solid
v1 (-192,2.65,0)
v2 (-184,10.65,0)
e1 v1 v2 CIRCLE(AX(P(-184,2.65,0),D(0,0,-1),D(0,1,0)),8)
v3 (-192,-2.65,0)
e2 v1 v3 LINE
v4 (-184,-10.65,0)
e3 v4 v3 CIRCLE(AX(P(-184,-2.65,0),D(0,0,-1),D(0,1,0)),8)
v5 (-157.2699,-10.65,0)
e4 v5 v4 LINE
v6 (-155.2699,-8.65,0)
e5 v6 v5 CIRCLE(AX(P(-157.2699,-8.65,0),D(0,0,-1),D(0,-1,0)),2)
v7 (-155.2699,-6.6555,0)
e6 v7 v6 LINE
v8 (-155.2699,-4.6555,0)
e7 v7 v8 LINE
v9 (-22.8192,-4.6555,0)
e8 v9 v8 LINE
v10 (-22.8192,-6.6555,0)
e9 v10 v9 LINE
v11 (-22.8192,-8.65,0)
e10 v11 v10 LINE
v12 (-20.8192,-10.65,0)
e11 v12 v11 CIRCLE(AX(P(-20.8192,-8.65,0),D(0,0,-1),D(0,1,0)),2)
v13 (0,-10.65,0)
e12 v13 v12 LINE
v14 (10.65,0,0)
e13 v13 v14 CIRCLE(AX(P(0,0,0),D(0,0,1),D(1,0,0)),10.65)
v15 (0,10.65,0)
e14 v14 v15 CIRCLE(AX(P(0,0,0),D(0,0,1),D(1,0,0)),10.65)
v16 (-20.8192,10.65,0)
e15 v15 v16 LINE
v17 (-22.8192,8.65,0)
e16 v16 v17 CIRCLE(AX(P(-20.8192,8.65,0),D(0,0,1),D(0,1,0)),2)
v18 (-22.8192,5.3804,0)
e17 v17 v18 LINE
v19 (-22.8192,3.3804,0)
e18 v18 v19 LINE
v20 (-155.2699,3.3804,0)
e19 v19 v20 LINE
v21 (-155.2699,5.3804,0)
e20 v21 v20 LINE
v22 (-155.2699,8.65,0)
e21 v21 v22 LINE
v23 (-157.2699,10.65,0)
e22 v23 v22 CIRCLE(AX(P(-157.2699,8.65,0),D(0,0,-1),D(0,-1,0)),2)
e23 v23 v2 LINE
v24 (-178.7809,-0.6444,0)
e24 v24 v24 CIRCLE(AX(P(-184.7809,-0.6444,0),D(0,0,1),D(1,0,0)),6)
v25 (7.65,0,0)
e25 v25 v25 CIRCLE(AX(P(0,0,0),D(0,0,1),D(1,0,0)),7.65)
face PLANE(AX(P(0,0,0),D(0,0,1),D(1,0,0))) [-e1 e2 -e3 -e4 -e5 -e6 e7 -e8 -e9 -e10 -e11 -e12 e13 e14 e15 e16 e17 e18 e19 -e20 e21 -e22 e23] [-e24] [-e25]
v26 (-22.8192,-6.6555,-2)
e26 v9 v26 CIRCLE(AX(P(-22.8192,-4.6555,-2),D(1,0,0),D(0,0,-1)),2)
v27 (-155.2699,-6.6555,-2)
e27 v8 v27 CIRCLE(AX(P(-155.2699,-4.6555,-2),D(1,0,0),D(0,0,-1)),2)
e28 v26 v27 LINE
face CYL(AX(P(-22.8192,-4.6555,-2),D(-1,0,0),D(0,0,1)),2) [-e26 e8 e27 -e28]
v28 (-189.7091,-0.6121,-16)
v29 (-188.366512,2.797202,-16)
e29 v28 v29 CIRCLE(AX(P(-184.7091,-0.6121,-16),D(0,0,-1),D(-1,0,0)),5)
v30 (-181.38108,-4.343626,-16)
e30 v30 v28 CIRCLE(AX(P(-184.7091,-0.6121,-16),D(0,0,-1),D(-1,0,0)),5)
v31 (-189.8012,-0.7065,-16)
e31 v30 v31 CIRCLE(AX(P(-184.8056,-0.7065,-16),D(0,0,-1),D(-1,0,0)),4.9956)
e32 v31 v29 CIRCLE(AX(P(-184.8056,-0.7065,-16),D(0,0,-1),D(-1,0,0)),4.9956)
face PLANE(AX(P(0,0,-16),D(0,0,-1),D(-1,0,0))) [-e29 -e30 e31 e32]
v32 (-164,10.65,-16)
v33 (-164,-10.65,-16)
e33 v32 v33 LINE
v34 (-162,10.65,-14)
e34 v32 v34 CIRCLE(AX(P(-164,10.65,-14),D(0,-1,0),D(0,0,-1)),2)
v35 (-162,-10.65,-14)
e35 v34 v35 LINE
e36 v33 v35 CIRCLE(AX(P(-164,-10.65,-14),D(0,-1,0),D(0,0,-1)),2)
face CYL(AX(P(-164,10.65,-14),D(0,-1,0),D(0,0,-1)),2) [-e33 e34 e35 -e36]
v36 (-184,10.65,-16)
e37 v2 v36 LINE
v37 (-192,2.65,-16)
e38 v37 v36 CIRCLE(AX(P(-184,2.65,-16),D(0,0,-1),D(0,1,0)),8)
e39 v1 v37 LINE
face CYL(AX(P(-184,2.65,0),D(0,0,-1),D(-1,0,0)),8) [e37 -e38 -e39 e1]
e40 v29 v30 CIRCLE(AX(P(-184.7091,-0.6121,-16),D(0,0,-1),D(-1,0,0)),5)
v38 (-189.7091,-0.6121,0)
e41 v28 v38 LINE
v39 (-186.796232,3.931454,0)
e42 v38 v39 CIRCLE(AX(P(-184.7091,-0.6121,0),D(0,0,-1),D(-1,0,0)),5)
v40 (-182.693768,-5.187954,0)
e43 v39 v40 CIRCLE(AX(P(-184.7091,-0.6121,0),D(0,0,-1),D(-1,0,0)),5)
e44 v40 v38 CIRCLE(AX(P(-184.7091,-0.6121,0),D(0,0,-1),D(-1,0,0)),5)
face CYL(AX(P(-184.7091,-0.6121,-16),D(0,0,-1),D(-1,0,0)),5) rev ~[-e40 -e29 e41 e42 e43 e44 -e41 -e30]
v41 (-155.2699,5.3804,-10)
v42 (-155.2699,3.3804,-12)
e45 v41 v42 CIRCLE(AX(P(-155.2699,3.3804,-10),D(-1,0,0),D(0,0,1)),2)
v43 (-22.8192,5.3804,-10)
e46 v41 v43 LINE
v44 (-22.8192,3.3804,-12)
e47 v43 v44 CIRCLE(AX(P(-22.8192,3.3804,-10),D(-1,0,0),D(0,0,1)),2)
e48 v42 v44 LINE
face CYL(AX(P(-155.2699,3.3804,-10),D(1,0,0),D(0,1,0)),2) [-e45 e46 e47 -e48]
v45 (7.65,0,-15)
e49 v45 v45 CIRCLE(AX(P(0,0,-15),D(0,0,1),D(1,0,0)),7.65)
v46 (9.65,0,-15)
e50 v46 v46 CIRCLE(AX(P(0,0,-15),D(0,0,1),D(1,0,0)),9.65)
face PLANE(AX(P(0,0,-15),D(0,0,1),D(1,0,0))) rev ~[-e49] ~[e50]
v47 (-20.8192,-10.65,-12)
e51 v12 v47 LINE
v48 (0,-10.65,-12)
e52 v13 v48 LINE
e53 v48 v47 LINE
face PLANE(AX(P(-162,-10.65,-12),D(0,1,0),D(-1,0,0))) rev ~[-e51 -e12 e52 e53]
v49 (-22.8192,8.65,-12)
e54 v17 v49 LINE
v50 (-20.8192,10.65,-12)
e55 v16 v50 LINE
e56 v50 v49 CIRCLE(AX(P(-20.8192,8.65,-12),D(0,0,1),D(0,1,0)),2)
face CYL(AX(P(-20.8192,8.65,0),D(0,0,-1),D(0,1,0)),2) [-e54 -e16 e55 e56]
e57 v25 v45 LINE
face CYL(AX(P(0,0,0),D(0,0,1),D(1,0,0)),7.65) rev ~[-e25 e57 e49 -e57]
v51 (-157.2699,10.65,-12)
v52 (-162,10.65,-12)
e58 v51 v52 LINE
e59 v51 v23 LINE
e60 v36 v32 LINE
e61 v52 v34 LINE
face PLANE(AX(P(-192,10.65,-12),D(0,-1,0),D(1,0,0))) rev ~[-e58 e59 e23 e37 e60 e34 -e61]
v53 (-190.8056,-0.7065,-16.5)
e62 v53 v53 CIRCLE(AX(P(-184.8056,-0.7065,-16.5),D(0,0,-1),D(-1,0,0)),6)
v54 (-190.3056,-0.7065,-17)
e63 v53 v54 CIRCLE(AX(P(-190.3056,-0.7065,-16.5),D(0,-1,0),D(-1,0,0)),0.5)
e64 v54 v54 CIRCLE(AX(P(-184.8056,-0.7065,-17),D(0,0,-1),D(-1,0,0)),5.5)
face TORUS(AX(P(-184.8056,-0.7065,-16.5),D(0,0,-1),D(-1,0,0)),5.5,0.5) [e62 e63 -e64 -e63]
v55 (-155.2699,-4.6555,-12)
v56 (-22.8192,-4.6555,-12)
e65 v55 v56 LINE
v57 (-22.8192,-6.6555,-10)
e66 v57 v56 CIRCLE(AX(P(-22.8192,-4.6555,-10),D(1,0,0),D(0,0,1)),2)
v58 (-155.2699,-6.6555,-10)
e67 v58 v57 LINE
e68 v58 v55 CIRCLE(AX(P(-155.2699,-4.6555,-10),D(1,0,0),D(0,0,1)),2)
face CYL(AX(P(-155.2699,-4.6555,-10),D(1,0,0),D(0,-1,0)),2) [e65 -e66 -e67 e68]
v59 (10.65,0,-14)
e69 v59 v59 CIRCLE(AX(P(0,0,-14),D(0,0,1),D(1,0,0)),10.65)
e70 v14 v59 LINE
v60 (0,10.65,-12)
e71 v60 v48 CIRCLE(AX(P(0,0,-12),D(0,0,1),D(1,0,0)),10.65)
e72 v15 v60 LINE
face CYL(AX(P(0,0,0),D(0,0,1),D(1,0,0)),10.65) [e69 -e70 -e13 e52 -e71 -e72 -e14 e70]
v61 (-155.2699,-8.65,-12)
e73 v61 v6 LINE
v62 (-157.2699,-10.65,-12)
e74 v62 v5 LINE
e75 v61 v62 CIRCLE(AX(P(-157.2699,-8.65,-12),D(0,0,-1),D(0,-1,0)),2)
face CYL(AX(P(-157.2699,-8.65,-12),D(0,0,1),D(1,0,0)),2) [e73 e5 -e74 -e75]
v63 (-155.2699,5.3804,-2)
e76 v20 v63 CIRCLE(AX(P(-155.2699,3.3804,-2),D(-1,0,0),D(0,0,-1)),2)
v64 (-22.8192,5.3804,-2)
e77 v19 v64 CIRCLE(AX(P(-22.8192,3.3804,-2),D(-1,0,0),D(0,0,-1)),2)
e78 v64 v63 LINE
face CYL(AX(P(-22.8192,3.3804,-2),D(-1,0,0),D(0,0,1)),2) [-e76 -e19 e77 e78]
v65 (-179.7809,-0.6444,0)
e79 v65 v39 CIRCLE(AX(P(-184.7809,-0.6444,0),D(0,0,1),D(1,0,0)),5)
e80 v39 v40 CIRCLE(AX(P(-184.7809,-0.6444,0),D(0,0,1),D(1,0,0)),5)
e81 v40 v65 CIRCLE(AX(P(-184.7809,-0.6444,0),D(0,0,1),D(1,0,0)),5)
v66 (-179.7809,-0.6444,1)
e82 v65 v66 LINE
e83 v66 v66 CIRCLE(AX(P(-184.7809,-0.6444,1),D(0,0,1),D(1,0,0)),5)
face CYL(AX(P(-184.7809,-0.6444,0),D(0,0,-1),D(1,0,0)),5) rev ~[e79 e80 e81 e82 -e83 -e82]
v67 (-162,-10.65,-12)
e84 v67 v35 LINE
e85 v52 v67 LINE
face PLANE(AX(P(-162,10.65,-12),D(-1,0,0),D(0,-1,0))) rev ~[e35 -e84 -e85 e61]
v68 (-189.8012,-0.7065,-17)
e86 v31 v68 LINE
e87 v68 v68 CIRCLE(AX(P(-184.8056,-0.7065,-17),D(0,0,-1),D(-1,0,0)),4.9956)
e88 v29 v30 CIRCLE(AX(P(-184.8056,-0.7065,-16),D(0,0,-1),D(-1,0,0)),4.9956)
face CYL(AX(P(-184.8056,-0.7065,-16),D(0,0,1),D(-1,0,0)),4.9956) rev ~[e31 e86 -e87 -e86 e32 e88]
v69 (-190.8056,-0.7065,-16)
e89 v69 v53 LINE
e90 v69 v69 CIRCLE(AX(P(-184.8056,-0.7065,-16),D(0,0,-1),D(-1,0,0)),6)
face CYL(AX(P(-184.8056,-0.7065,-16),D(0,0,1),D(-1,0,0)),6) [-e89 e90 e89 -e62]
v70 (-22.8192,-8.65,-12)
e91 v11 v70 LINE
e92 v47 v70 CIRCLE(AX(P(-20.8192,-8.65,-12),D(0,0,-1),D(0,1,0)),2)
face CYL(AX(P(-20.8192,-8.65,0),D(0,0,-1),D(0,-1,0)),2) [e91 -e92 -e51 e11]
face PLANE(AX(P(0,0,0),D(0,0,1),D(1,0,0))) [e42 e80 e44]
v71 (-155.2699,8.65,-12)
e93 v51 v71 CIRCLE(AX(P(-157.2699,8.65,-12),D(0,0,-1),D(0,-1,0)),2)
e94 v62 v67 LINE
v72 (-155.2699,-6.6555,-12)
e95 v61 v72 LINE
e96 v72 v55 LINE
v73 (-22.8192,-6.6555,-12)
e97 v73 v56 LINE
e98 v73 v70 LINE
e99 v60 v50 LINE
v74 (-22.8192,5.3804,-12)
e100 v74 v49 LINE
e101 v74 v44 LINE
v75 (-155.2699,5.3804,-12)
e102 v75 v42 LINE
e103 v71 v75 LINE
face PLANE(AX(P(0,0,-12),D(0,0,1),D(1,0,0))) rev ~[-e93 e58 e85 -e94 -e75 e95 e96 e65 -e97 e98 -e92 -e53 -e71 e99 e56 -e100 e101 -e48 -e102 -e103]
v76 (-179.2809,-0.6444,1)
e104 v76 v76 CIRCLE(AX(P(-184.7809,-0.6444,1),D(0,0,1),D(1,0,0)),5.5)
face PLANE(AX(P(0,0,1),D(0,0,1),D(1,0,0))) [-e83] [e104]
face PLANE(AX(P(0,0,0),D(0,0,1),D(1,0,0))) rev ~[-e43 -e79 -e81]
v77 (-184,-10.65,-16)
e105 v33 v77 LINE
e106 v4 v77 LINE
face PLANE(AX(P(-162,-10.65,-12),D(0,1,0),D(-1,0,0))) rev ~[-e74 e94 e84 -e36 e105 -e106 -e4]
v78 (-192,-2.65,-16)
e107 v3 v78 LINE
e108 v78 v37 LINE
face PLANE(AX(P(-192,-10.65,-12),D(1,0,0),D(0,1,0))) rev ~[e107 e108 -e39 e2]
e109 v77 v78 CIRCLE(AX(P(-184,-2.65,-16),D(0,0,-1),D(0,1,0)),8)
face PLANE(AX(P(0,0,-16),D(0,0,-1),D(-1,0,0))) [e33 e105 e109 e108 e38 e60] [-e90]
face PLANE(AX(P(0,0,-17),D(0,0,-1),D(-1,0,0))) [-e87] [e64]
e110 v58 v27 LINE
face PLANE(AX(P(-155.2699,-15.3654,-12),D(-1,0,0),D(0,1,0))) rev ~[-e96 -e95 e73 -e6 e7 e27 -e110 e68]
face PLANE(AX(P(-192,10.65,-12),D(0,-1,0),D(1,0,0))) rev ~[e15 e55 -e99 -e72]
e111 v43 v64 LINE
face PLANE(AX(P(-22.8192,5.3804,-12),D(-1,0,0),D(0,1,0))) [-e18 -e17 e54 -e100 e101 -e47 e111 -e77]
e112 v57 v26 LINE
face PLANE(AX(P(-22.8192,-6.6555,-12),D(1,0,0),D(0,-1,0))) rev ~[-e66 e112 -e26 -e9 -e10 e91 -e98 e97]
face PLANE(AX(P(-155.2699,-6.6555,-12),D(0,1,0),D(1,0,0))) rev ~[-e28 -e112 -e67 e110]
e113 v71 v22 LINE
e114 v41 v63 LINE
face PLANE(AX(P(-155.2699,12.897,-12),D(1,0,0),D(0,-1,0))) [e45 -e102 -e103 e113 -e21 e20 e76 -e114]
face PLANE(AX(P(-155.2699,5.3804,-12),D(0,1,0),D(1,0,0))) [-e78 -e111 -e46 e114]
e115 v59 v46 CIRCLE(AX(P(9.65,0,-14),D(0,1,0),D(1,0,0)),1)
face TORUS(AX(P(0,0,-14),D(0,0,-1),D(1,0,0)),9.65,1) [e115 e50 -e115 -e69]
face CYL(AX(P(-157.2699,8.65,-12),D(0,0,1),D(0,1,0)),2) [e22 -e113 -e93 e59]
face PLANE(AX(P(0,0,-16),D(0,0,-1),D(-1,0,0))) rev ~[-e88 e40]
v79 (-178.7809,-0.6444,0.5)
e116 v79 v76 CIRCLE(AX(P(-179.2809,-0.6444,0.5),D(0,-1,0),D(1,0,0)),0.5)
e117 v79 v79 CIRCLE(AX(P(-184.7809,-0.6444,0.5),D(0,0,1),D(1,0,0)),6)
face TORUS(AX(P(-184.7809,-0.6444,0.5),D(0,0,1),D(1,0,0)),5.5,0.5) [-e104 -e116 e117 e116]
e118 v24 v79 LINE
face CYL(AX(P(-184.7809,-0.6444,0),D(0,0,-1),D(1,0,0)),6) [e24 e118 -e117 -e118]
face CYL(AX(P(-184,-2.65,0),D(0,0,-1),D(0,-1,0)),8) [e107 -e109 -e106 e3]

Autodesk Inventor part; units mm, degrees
ref_plane "YZ Plane" through (0, 0, 0) normal (1, 0, 0) x (0, 1, 0)
ref_plane "XZ Plane" through (0, 0, 0) normal (0, 1, 0) x (-1, 0, 0)
ref_plane "XY Plane" through (0, 0, 0) normal (0, 0, 1) x (1, 0, 0)
sketch "Boceto1" plane through (0, 0, 0) normal (0, 0, 1) x (1, 0, 0)
  circle A0 centre (0, 0) radius 7.65
  circle A1 centre (0, 0) radius 10.65
  dimension "d0" = 15.3
  dimension "d1" = 21.3
extrude "Extrusión1" add sketch "Boceto1" against normal blind 15
sketch "Boceto4" plane through (0, 0, 0) normal (0, 0, 1) x (1, 0, 0)
  circle A0 centre (0, 0) radius 10.65 projected
  line L0 (0, -10.65) -> (-192, -10.65)
  line L1 (0, -10.65) -> (192, -10.65) construction
  line L2 (0, 10.65) -> (-192, 10.65)
  line L3 (-192, 10.65) -> (-192, -10.65)
  dimension "d4" = 192
  dimension "d5" = 180
extrude "Extrusión2" add sketch "Boceto4" against normal blind 12 contours A0 L0 L3 L2
sketch "Boceto17" plane through (0, 0, -12) normal (0, 0, -1) x (-1, 0, 0)
  line L0 (192, -10.65) -> (192, 10.65) projected
  line L1 (0, -10.65) -> (192, -10.65) projected
  line L2 (192, 10.65) -> (162, 10.65)
  line L3 (162, 10.65) -> (162, -10.65)
  line L4 (162, -10.65) -> (192, -10.65)
  line L5 (192, -10.65) -> (192, 10.65)
  point P0 (0, 0)
  dimension "d75" = 30
extrude "Extrusión14" add sketch "Boceto17" along normal blind 4
sketch "Boceto18" plane through (0, 0, -16) normal (0, 0, -1) x (-1, 0, 0)
  circle A0 centre (184.7091, -0.6121) radius 5
  point P0 (0, 0)
  dimension "d78" = 10
extrude "Extrusión15" cut sketch "Boceto18" against normal blind 16
sketch "Boceto19" plane through (0, 0, -16) normal (0, 0, -1) x (-1, 0, 0)
  circle A0 centre (184.8056, -0.7065) radius 4.9956
  circle A1 centre (184.8056, -0.7065) radius 6
  point P0 (0, 0)
  dimension "d81" = 12
extrude "Extrusión16" add sketch "Boceto19" along normal blind 1
fillet "Empalme10" radius 0.5 1 edges at (-178.8056, -0.7065, -17)
fillet "Empalme11" radius 8 2 edges at (-192, 10.65, -8) (-192, -10.65, -8)
sketch "Boceto20" plane through (0, 0, 0) normal (0, 0, 1) x (1, 0, 0)
  circle A0 centre (-184.7809, -0.6444) radius 5
  circle A1 centre (-184.7809, -0.6444) radius 6
  point P0 (0, 0)
  dimension "d86" = 10
  dimension "d87" = 12
extrude "Extrusión17" add sketch "Boceto20" along normal blind 1
fillet "Empalme12" radius 0.5 1 edges at (-190.7809, -0.6444, 1)
fillet "Empalme13" radius 2 1 edges at (-162, 0, -16)
fillet "Empalme14" radius 1 1 edges at (-10.65, 0, -15)
sketch "Boceto21" plane through (0, 0, -12) normal (0, 0, -1) x (-1, 0, 0)
  line L0 (155.2699, -6.6555) -> (22.8192, -6.6555)
  line L1 (22.8192, -6.6555) -> (22.8192, -15.3654)
  line L2 (22.8192, -15.3654) -> (155.2699, -15.3654)
  line L3 (155.2699, -15.3654) -> (155.2699, -6.6555)
  line L4 (155.2699, 5.3804) -> (22.8192, 5.3804)
  line L5 (22.8192, 5.3804) -> (22.8192, 12.897)
  line L6 (22.8192, 12.897) -> (155.2699, 12.897)
  line L7 (155.2699, 12.897) -> (155.2699, 5.3804)
  point P0 (0, 0)
extrude "Extrusión18" cut sketch "Boceto21" against normal blind 24
fillet "Empalme15" radius 2 4 edges at (-22.8192, 10.65, -6) (-22.8192, -10.65, -6) (-155.2699, 10.65, -6) (-155.2699, -10.65, -6)
fillet "Empalme16" radius 2 4 edges at (-89.0446, 5.3804, -12) (-89.0446, -6.6555, -12) (-89.0446, 5.3804, 0) (-89.0446, -6.6555, 0)
properties part number "barraConector"
